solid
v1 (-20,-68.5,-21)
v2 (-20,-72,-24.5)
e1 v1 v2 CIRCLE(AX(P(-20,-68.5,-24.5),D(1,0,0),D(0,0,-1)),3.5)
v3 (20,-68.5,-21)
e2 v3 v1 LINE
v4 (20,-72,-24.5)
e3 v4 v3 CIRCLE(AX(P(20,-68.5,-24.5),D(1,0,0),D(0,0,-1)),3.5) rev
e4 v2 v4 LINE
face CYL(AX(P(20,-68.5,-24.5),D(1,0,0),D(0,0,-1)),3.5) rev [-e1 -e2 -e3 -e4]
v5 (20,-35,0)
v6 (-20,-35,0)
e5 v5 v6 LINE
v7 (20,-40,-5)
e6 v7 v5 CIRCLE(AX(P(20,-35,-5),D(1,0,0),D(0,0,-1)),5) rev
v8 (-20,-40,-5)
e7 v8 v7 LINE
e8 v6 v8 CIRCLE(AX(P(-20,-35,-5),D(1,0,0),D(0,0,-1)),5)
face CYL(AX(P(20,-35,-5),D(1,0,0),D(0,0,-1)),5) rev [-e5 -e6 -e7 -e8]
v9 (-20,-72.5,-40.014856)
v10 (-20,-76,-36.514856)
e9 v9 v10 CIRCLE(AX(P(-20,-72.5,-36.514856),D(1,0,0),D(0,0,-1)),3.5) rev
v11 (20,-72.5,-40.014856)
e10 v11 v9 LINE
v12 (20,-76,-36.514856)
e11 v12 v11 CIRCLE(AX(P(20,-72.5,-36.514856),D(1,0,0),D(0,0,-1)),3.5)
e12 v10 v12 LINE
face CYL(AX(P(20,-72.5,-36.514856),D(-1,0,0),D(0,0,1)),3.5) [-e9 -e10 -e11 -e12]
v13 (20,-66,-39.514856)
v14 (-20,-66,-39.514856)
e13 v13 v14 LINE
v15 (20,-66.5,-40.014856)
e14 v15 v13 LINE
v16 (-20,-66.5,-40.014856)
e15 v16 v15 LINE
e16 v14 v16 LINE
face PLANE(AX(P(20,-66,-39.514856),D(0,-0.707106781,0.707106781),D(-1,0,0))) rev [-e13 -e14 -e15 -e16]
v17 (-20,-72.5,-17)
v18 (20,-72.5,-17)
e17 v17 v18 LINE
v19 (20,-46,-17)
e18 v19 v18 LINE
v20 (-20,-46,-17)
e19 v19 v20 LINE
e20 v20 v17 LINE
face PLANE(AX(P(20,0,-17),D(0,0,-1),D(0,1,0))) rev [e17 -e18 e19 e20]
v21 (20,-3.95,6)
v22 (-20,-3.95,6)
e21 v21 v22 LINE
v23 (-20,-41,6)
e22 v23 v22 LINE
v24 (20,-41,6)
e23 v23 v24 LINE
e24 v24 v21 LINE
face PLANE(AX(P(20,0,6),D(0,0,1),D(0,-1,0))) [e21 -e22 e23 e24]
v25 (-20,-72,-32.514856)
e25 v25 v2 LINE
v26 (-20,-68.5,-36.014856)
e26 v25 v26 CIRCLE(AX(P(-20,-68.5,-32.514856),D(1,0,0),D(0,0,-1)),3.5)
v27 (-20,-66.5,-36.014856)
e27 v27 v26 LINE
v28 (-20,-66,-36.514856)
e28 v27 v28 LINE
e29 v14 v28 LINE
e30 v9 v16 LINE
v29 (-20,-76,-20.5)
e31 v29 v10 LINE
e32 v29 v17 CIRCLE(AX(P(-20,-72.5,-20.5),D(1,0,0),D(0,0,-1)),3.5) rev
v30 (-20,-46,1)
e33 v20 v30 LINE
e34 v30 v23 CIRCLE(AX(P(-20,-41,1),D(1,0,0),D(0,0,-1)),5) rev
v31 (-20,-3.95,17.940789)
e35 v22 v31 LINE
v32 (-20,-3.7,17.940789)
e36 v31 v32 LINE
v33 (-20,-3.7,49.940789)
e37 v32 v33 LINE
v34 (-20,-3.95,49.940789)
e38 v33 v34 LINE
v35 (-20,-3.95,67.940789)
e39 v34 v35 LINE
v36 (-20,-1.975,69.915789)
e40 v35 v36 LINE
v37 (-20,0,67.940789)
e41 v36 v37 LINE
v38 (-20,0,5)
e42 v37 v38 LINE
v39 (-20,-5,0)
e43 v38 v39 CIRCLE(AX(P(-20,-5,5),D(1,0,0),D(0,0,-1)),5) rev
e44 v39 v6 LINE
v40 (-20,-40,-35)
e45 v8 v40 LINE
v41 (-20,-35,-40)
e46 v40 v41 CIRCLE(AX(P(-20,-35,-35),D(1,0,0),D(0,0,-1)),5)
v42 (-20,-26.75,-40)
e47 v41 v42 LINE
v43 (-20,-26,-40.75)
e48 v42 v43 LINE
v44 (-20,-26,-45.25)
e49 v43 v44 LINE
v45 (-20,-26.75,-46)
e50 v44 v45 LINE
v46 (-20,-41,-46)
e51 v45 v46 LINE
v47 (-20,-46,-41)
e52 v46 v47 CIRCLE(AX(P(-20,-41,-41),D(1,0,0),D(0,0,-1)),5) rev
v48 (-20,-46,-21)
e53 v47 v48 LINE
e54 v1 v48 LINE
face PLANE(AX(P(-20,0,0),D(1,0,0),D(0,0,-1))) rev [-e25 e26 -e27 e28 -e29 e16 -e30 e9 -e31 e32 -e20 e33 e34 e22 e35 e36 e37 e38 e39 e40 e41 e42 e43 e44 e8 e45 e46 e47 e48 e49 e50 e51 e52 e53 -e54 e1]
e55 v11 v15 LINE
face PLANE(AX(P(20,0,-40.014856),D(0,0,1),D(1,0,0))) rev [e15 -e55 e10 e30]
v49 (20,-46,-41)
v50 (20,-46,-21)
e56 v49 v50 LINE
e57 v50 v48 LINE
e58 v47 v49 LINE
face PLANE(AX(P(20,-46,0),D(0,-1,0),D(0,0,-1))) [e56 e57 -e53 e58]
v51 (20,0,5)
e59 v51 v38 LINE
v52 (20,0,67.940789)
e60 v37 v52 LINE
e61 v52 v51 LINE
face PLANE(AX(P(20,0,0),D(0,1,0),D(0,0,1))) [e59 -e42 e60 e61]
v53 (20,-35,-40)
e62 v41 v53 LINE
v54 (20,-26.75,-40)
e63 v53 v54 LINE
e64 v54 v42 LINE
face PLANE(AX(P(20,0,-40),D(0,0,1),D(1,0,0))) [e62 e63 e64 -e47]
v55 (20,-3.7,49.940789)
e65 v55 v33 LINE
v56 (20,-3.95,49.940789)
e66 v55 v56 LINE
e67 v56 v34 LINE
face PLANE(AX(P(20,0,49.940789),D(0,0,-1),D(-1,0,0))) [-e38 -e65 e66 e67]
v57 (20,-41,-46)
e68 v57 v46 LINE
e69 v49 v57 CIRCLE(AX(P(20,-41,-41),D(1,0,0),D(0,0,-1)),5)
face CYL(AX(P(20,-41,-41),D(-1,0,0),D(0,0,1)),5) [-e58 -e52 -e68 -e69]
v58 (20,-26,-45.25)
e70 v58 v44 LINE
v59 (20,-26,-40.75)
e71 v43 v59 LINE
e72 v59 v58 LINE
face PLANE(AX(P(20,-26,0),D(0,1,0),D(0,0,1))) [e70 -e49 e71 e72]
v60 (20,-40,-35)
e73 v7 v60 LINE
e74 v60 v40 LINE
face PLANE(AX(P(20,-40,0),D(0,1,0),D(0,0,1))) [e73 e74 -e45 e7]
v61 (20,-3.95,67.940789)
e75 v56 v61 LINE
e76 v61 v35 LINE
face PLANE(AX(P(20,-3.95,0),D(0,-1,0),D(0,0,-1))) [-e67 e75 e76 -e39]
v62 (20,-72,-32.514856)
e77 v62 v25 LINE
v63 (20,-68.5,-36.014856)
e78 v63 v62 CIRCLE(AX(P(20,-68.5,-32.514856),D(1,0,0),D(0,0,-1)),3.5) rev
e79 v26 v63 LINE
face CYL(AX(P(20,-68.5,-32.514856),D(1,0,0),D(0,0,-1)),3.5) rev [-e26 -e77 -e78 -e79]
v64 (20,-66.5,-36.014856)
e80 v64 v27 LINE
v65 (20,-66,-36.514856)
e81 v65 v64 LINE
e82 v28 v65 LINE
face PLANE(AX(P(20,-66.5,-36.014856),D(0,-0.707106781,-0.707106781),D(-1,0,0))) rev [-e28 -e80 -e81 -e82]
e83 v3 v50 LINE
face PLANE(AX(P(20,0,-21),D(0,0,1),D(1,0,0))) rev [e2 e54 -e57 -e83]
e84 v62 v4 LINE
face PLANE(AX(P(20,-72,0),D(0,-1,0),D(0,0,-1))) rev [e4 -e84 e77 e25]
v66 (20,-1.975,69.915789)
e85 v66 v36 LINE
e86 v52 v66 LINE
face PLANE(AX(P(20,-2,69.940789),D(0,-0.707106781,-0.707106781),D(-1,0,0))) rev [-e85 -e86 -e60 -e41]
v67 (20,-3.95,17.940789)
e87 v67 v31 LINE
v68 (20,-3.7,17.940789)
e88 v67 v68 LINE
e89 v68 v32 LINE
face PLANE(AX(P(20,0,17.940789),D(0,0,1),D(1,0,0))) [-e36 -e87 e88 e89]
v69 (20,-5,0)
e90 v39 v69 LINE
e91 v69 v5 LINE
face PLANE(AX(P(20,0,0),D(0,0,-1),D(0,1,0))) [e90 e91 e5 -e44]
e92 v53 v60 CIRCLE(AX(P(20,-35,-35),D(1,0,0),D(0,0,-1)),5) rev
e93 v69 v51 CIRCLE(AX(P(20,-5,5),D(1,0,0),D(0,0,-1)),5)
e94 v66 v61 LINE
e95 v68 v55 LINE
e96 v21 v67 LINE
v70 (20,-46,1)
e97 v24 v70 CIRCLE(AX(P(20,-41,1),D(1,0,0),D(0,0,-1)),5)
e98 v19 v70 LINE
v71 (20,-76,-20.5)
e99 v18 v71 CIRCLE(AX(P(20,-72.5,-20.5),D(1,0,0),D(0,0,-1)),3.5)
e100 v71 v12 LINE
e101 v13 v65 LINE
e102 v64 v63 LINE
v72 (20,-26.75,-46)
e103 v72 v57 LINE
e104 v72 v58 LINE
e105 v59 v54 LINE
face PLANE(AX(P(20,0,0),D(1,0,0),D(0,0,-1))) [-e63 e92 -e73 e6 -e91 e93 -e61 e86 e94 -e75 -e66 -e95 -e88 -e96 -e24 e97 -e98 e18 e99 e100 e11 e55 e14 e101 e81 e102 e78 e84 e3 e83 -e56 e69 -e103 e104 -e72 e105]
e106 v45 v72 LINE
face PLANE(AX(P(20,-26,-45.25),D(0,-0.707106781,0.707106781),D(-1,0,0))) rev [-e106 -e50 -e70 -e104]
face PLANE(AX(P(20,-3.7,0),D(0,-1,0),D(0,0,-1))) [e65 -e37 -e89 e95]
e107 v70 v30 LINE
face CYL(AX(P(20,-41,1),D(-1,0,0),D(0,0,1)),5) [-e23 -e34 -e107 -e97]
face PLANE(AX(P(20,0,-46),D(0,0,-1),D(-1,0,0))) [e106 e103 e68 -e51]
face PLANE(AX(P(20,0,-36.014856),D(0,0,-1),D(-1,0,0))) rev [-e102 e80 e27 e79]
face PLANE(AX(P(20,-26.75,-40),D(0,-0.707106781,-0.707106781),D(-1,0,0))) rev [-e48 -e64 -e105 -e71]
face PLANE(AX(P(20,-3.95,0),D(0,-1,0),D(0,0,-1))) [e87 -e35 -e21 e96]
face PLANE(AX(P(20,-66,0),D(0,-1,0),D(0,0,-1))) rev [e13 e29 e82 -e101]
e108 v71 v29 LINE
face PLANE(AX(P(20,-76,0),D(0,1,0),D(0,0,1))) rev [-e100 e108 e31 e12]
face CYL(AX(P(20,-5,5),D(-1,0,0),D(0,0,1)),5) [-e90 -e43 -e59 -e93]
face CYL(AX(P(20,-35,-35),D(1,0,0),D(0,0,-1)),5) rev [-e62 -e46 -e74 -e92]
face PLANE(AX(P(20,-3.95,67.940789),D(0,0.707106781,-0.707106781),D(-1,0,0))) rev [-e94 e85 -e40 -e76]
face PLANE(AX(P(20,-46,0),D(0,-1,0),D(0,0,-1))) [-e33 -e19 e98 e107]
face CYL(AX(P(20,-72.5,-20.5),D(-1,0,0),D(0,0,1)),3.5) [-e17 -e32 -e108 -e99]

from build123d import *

# Parameters (mm, degrees)
BOSS_EXTRUDE1_DEPTH = 20
FILLET2_R           = 5
FILLET3_R           = 5
FILLET4_R           = 5
FILLET5_R           = 3.5
CHAMFER1_SIZE       = 2
CHAMFER2_SIZE       = 0.75
CHAMFER3_SIZE       = 0.5


with BuildPart() as part:
    # Sketch1 → Boss-Extrude1 (new, symmetric)
    with BuildSketch(Plane(origin=(0, 0, 0), x_dir=(0, 0, -1), z_dir=(1, 0, 0))):
        Polygon((-69.940788655, 0), (-15, 0), (0, 0), (0, -40), (40, -40), (40, -26), (46, -26), (46, -46), (-6, -46), (-6, -3.95), (-13.226857143, -3.95), (-17.940788655, -3.95), (-17.940788655, -3.7), (-49.940788655, -3.7), (-49.940788655, -3.95), (-69.940788655, -3.95), align=None)
        Polygon((21, -72), (21, -46), (17, -46), (17, -76), (40.014855678, -76), (40.014855678, -66), (36.014855678, -66), (36.014855678, -72), align=None)
    extrude(amount=BOSS_EXTRUDE1_DEPTH, both=True)

    # Fillet2
    fillet2_edges = [part.edges().sort_by_distance(p)[0] for p in [
        (0, 0, 0),
    ]]
    fillet(fillet2_edges, radius=FILLET2_R)

    # Fillet3
    fillet3_edges = [part.edges().sort_by_distance(p)[0] for p in [
        (0, -40, 0),
        (0, -40, -40),
    ]]
    fillet(fillet3_edges, radius=FILLET3_R)

    # Fillet4
    fillet4_edges = [part.edges().sort_by_distance(p)[0] for p in [
        (0, -46, -46),
        (0, -46, 6),
    ]]
    fillet(fillet4_edges, radius=FILLET4_R)

    # Fillet5
    fillet5_edges = [part.edges().sort_by_distance(p)[0] for p in [
        (0, -72, -21),
        (0, -72, -36.014855678),
        (0, -76, -40.014855678),
        (0, -76, -17),
    ]]
    fillet(fillet5_edges, radius=FILLET5_R)

    # Chamfer1
    # the kernel refuses this chamfer: 2 mm, written as the material it takes off along each edge
    with BuildSketch(Plane(origin=(-25.143365976, -3.95, 69.940788655), x_dir=(0, 0.9996219169112968, 0.027495876610589075), z_dir=(1, 0, 0)), Plane(origin=(-25.143365976, 0, 69.940788655), x_dir=(0, 0.02749587661058631, -0.9996219169112968), z_dir=(1, 0, 0))) as chamfer1_piece_1:
        Polygon((CHAMFER1_SIZE * 0.999621916911, -CHAMFER1_SIZE * 0.0274958766106), (-CHAMFER1_SIZE * 0.0274958766106, -CHAMFER1_SIZE * 0.999621916911), (0, 0), align=None)
    extrude(amount=50.286731952, mode=Mode.SUBTRACT)

    # Chamfer2
    chamfer2_edges = [part.edges().sort_by_distance(p)[0] for p in [
        (0, -26, -40),
        (0, -26, -46),
    ]]
    chamfer(chamfer2_edges, length=CHAMFER2_SIZE)

    # Chamfer3
    chamfer3_edges = [part.edges().sort_by_distance(p)[0] for p in [
        (0, -66, -36.014855678),
        (0, -66, -40.014855678),
    ]]
    chamfer(chamfer3_edges, length=CHAMFER3_SIZE)


solid = part.part
